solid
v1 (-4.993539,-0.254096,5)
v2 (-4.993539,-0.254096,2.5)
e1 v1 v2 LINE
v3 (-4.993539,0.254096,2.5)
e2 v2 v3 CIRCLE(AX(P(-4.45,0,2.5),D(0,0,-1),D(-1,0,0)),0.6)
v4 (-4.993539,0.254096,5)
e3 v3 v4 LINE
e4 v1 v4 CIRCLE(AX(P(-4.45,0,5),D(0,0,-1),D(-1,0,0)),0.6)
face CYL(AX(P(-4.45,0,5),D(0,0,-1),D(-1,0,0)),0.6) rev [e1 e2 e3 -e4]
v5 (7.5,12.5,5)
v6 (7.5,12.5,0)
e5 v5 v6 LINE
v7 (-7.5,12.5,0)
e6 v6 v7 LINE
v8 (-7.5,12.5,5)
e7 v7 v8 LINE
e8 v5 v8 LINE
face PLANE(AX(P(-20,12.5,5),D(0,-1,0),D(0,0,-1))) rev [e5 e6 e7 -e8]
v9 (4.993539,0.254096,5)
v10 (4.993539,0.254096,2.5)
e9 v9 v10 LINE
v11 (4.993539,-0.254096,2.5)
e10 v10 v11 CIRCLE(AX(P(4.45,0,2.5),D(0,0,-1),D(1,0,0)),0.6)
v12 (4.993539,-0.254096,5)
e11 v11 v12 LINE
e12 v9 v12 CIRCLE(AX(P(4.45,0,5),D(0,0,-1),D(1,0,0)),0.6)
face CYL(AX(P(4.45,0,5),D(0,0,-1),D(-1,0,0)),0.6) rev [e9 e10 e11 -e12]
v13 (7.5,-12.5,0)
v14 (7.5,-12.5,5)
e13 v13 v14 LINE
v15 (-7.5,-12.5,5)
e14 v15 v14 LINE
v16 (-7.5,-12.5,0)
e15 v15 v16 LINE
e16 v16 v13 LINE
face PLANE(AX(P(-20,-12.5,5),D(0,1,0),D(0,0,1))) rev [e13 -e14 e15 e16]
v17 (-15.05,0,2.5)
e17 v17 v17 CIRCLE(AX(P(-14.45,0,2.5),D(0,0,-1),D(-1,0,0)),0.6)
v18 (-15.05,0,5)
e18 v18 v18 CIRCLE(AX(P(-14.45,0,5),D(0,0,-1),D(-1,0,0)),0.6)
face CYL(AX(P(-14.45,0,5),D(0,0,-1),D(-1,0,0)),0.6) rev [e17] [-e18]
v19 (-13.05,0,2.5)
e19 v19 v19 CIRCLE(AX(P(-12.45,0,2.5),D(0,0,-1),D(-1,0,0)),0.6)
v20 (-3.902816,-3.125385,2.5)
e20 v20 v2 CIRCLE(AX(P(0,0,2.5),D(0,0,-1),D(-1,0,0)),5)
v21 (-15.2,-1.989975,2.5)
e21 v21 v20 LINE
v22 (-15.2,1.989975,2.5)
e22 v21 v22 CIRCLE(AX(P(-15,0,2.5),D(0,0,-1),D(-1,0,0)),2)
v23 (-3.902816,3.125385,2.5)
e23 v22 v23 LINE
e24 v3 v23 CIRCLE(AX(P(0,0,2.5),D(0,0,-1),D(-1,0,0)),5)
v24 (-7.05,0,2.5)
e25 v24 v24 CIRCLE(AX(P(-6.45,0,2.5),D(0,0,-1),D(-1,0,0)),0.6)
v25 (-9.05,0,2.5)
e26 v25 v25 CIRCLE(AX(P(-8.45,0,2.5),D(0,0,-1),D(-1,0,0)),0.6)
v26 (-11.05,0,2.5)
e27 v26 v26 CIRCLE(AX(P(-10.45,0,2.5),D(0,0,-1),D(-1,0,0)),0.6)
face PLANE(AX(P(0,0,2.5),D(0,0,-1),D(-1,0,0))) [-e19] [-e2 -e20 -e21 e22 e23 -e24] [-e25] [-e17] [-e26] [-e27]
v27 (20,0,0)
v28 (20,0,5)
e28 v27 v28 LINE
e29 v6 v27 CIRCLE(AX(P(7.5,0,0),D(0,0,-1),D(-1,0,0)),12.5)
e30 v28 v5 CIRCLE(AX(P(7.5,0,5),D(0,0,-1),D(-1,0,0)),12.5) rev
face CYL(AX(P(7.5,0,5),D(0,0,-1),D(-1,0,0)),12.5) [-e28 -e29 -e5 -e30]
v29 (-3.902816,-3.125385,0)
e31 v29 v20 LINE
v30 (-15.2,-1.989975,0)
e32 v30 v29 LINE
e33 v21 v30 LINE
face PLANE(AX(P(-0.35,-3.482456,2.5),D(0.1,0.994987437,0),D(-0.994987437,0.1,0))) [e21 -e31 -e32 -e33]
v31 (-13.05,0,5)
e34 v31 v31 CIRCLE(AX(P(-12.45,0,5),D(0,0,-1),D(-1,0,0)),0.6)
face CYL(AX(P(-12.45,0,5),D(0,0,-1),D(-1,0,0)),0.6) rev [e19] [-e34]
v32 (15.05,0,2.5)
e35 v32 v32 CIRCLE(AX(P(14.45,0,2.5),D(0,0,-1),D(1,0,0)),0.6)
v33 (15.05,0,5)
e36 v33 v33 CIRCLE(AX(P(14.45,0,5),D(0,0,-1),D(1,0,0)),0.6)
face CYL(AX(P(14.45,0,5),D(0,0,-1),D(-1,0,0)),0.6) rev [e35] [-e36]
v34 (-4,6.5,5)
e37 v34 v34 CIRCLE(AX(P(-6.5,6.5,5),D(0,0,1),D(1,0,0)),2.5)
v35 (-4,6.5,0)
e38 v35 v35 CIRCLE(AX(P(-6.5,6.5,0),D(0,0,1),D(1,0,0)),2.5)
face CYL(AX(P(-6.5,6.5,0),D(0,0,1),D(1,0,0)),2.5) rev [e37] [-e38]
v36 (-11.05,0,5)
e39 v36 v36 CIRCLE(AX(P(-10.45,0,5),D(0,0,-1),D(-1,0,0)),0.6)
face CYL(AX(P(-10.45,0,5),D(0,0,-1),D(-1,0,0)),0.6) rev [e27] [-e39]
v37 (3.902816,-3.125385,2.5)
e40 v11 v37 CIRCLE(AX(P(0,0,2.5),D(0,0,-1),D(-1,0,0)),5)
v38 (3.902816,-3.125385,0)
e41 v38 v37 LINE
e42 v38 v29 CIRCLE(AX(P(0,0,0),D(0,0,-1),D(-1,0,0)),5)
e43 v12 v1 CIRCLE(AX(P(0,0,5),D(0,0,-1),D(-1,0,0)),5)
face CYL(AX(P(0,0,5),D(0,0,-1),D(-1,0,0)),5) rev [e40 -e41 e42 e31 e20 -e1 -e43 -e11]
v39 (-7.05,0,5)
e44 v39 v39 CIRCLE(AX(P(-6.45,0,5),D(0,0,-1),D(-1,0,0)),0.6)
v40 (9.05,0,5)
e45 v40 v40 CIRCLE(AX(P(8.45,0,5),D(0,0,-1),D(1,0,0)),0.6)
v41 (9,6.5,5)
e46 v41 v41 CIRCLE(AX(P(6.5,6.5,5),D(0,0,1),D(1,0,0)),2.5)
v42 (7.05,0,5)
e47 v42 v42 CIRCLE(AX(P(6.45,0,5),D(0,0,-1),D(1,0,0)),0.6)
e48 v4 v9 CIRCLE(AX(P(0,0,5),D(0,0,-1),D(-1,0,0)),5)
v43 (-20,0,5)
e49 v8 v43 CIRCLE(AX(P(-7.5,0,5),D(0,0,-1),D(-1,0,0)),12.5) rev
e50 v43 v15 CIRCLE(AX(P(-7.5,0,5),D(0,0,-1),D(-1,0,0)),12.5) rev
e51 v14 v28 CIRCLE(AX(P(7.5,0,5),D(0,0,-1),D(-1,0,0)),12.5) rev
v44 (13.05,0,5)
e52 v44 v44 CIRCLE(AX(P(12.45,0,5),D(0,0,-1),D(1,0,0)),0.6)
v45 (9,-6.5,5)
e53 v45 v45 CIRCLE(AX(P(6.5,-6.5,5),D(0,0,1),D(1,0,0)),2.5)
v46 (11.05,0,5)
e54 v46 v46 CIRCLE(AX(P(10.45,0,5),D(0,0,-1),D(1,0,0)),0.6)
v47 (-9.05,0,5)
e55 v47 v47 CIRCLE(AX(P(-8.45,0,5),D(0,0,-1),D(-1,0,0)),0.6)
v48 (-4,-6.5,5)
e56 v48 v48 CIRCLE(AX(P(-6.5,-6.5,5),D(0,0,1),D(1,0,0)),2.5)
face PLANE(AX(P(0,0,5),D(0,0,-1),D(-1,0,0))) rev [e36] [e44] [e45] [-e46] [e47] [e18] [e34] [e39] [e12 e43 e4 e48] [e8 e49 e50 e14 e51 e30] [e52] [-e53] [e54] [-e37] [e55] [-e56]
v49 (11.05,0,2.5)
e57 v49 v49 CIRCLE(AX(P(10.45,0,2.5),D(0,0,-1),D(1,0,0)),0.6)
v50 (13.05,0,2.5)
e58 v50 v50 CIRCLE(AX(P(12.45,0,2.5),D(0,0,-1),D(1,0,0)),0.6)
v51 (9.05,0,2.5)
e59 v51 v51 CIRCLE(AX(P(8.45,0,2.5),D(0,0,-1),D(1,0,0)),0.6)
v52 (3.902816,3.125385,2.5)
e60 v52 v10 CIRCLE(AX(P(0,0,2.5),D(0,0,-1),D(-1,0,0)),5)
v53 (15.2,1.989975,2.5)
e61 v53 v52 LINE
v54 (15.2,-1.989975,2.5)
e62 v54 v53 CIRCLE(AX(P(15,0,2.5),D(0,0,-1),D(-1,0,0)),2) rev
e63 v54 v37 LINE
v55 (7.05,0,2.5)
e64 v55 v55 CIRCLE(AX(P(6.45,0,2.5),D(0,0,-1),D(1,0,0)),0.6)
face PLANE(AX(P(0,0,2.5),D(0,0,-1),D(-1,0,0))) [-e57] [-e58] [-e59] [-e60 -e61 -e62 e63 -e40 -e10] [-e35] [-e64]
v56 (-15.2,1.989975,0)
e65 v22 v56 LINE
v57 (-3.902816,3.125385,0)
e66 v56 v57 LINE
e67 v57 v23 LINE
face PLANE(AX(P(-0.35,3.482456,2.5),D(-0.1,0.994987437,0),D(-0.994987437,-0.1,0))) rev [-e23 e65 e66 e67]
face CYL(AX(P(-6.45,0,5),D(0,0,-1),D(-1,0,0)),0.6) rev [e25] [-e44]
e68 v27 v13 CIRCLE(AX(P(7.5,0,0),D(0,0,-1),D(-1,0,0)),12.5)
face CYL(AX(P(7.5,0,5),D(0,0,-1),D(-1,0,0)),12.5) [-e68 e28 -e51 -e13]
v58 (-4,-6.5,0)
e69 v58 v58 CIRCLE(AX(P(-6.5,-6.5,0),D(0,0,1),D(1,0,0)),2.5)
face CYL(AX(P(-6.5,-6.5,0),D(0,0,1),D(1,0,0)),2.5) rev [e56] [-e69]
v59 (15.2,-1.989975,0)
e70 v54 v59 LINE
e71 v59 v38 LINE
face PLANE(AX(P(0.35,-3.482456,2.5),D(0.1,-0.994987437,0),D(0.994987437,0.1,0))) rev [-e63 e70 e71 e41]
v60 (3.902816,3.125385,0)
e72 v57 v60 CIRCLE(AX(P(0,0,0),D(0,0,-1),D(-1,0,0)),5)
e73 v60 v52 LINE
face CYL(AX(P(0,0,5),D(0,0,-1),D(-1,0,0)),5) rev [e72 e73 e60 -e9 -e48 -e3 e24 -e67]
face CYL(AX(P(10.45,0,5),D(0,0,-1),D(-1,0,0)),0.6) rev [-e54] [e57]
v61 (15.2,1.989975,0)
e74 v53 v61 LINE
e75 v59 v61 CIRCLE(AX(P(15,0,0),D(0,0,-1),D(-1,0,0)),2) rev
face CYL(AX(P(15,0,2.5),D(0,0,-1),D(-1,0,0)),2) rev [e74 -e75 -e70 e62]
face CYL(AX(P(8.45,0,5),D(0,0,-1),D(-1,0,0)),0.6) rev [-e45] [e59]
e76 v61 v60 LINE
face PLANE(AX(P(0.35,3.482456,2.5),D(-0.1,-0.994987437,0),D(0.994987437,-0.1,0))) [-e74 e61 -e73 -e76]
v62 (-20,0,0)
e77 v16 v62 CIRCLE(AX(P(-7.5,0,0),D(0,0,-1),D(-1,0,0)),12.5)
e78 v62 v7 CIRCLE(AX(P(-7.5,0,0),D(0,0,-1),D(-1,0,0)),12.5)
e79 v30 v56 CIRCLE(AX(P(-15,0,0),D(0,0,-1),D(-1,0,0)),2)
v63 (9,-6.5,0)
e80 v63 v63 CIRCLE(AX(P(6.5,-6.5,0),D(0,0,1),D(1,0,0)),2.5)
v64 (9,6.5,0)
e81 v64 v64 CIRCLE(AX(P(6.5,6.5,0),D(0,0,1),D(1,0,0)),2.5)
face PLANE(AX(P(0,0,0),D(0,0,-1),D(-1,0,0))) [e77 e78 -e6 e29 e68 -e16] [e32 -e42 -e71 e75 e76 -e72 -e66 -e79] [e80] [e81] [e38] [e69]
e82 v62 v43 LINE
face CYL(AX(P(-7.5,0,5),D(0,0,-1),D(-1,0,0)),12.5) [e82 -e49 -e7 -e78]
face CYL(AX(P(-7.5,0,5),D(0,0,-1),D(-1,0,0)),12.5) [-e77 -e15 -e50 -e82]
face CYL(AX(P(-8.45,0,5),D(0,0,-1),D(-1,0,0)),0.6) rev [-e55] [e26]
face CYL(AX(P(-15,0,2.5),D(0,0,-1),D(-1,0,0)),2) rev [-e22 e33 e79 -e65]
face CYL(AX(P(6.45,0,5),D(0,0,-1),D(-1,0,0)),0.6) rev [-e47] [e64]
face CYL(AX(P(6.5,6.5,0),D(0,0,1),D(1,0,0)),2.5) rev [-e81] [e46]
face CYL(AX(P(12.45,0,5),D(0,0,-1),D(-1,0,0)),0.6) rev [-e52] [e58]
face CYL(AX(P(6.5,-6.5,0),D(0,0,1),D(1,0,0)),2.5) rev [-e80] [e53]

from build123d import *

# Parameters (mm, degrees)
SKETCH1_W              = 40
SKETCH1_H              = 25
BOSS_EXTRUDE2_DEPTH    = 5
CUT_EXTRUDE1_DEPTH     = 2.5
CUT_EXTRUDE2_START     = -2.5
CUT_EXTRUDE2_OUTLINE_R = 0.6
CUT_EXTRUDE2_DEPTH     = 2.5
SKETCH7_R              = 5
CUT_EXTRUDE3_DEPTH     = 25.109126902
SKETCH8_R              = 2.5
CUT_EXTRUDE4_DEPTH     = 25.109126902
FILLET1_R              = 12.5


# Read off the part's stored shape, not the designer's step: Cut-Extrude2
with BuildPart() as part:
    # Sketch1 → Boss-Extrude2 (new body)
    with BuildSketch(Plane.XY):
        Rectangle(SKETCH1_W, SKETCH1_H)
    extrude(amount=BOSS_EXTRUDE2_DEPTH)

    # Sketch4 → Cut-Extrude1 (cut)
    with BuildSketch(Plane(origin=(0, 0, 0), x_dir=(-1, 0, 0), z_dir=(0, 0, -1))):
        with BuildLine():
            Line((-0.35, 3.48245603), (-15.2, 1.989974874))
            ThreePointArc((-15.2, 1.989974874), (-17, 0), (-15.2, -1.989974874))
            Line((-15.2, -1.989974874), (-0.35, -3.48245603))
            ThreePointArc((-0.35, -3.48245603), (0, -3.5), (0.35, -3.48245603))
            Line((0.35, -3.48245603), (15.2, -1.989974874))
            ThreePointArc((15.2, -1.989974874), (17, 0), (15.2, 1.989974874))
            Line((15.2, 1.989974874), (0.35, 3.48245603))
            ThreePointArc((0.35, 3.48245603), (0, 3.5), (-0.35, 3.48245603))
        make_face()
    extrude(amount=-CUT_EXTRUDE1_DEPTH, mode=Mode.SUBTRACT)

    # Cut-Extrude2 outline → Cut-Extrude2 (cut)
    with BuildSketch(Plane(origin=(0, 0, 2.5), x_dir=(-1, 0, 0), z_dir=(0, 0, -1)).offset(CUT_EXTRUDE2_START)):
        with BuildLine():
            ThreePointArc((3.982303371, 0.375845531), (4, 0), (3.982303371, -0.375845531))
            ThreePointArc((3.982303371, -0.375845531), (5.05, 0), (3.982303371, 0.375845531))
        make_face()
        with Locations((-4.45, 0)):
            Circle(CUT_EXTRUDE2_OUTLINE_R)
        with Locations((-6.45, 0)):
            Circle(CUT_EXTRUDE2_OUTLINE_R)
        with Locations((-8.45, 0)):
            Circle(CUT_EXTRUDE2_OUTLINE_R)
        with Locations((-14.45, 0)):
            Circle(CUT_EXTRUDE2_OUTLINE_R)
        with Locations((8.45, 0)):
            Circle(CUT_EXTRUDE2_OUTLINE_R)
        with Locations((10.45, 0)):
            Circle(CUT_EXTRUDE2_OUTLINE_R)
        with Locations((12.45, 0)):
            Circle(CUT_EXTRUDE2_OUTLINE_R)
        with Locations((14.45, 0)):
            Circle(CUT_EXTRUDE2_OUTLINE_R)
        with Locations((-12.45, 0)):
            Circle(CUT_EXTRUDE2_OUTLINE_R)
        with Locations((-10.45, 0)):
            Circle(CUT_EXTRUDE2_OUTLINE_R)
        with Locations((6.45, 0)):
            Circle(CUT_EXTRUDE2_OUTLINE_R)
    extrude(amount=CUT_EXTRUDE2_DEPTH, mode=Mode.SUBTRACT)

    # Sketch7 → Cut-Extrude3 (cut, through all)
    with BuildSketch(Plane(origin=(0, 0, 0), x_dir=(-1, 0, 0), z_dir=(0, 0, -1))):
        Circle(SKETCH7_R)
    extrude(amount=-CUT_EXTRUDE3_DEPTH, mode=Mode.SUBTRACT)

    # Sketch8 → Cut-Extrude4 (cut, through all)
    with BuildSketch(Plane.XY.offset(5)):
        with Locations((6.5, 6.5)):
            Circle(SKETCH8_R)
        with Locations((-6.5, 6.5)):
            Circle(SKETCH8_R)
        with Locations((-6.5, -6.5)):
            Circle(SKETCH8_R)
        with Locations((6.5, -6.5)):
            Circle(SKETCH8_R)
    extrude(amount=-CUT_EXTRUDE4_DEPTH, mode=Mode.SUBTRACT)

    # Fillet1
    fillet1_edges = [part.edges().sort_by_distance(p)[0] for p in [
        (-20, 12.5, 2.5),
        (-20, -12.5, 2.5),
        (20, -12.5, 2.5),
        (20, 12.5, 2.5),
    ]]
    fillet(fillet1_edges, radius=FILLET1_R - 0.0001)  # a hair under: the kernel refuses the full size


solid = part.part
